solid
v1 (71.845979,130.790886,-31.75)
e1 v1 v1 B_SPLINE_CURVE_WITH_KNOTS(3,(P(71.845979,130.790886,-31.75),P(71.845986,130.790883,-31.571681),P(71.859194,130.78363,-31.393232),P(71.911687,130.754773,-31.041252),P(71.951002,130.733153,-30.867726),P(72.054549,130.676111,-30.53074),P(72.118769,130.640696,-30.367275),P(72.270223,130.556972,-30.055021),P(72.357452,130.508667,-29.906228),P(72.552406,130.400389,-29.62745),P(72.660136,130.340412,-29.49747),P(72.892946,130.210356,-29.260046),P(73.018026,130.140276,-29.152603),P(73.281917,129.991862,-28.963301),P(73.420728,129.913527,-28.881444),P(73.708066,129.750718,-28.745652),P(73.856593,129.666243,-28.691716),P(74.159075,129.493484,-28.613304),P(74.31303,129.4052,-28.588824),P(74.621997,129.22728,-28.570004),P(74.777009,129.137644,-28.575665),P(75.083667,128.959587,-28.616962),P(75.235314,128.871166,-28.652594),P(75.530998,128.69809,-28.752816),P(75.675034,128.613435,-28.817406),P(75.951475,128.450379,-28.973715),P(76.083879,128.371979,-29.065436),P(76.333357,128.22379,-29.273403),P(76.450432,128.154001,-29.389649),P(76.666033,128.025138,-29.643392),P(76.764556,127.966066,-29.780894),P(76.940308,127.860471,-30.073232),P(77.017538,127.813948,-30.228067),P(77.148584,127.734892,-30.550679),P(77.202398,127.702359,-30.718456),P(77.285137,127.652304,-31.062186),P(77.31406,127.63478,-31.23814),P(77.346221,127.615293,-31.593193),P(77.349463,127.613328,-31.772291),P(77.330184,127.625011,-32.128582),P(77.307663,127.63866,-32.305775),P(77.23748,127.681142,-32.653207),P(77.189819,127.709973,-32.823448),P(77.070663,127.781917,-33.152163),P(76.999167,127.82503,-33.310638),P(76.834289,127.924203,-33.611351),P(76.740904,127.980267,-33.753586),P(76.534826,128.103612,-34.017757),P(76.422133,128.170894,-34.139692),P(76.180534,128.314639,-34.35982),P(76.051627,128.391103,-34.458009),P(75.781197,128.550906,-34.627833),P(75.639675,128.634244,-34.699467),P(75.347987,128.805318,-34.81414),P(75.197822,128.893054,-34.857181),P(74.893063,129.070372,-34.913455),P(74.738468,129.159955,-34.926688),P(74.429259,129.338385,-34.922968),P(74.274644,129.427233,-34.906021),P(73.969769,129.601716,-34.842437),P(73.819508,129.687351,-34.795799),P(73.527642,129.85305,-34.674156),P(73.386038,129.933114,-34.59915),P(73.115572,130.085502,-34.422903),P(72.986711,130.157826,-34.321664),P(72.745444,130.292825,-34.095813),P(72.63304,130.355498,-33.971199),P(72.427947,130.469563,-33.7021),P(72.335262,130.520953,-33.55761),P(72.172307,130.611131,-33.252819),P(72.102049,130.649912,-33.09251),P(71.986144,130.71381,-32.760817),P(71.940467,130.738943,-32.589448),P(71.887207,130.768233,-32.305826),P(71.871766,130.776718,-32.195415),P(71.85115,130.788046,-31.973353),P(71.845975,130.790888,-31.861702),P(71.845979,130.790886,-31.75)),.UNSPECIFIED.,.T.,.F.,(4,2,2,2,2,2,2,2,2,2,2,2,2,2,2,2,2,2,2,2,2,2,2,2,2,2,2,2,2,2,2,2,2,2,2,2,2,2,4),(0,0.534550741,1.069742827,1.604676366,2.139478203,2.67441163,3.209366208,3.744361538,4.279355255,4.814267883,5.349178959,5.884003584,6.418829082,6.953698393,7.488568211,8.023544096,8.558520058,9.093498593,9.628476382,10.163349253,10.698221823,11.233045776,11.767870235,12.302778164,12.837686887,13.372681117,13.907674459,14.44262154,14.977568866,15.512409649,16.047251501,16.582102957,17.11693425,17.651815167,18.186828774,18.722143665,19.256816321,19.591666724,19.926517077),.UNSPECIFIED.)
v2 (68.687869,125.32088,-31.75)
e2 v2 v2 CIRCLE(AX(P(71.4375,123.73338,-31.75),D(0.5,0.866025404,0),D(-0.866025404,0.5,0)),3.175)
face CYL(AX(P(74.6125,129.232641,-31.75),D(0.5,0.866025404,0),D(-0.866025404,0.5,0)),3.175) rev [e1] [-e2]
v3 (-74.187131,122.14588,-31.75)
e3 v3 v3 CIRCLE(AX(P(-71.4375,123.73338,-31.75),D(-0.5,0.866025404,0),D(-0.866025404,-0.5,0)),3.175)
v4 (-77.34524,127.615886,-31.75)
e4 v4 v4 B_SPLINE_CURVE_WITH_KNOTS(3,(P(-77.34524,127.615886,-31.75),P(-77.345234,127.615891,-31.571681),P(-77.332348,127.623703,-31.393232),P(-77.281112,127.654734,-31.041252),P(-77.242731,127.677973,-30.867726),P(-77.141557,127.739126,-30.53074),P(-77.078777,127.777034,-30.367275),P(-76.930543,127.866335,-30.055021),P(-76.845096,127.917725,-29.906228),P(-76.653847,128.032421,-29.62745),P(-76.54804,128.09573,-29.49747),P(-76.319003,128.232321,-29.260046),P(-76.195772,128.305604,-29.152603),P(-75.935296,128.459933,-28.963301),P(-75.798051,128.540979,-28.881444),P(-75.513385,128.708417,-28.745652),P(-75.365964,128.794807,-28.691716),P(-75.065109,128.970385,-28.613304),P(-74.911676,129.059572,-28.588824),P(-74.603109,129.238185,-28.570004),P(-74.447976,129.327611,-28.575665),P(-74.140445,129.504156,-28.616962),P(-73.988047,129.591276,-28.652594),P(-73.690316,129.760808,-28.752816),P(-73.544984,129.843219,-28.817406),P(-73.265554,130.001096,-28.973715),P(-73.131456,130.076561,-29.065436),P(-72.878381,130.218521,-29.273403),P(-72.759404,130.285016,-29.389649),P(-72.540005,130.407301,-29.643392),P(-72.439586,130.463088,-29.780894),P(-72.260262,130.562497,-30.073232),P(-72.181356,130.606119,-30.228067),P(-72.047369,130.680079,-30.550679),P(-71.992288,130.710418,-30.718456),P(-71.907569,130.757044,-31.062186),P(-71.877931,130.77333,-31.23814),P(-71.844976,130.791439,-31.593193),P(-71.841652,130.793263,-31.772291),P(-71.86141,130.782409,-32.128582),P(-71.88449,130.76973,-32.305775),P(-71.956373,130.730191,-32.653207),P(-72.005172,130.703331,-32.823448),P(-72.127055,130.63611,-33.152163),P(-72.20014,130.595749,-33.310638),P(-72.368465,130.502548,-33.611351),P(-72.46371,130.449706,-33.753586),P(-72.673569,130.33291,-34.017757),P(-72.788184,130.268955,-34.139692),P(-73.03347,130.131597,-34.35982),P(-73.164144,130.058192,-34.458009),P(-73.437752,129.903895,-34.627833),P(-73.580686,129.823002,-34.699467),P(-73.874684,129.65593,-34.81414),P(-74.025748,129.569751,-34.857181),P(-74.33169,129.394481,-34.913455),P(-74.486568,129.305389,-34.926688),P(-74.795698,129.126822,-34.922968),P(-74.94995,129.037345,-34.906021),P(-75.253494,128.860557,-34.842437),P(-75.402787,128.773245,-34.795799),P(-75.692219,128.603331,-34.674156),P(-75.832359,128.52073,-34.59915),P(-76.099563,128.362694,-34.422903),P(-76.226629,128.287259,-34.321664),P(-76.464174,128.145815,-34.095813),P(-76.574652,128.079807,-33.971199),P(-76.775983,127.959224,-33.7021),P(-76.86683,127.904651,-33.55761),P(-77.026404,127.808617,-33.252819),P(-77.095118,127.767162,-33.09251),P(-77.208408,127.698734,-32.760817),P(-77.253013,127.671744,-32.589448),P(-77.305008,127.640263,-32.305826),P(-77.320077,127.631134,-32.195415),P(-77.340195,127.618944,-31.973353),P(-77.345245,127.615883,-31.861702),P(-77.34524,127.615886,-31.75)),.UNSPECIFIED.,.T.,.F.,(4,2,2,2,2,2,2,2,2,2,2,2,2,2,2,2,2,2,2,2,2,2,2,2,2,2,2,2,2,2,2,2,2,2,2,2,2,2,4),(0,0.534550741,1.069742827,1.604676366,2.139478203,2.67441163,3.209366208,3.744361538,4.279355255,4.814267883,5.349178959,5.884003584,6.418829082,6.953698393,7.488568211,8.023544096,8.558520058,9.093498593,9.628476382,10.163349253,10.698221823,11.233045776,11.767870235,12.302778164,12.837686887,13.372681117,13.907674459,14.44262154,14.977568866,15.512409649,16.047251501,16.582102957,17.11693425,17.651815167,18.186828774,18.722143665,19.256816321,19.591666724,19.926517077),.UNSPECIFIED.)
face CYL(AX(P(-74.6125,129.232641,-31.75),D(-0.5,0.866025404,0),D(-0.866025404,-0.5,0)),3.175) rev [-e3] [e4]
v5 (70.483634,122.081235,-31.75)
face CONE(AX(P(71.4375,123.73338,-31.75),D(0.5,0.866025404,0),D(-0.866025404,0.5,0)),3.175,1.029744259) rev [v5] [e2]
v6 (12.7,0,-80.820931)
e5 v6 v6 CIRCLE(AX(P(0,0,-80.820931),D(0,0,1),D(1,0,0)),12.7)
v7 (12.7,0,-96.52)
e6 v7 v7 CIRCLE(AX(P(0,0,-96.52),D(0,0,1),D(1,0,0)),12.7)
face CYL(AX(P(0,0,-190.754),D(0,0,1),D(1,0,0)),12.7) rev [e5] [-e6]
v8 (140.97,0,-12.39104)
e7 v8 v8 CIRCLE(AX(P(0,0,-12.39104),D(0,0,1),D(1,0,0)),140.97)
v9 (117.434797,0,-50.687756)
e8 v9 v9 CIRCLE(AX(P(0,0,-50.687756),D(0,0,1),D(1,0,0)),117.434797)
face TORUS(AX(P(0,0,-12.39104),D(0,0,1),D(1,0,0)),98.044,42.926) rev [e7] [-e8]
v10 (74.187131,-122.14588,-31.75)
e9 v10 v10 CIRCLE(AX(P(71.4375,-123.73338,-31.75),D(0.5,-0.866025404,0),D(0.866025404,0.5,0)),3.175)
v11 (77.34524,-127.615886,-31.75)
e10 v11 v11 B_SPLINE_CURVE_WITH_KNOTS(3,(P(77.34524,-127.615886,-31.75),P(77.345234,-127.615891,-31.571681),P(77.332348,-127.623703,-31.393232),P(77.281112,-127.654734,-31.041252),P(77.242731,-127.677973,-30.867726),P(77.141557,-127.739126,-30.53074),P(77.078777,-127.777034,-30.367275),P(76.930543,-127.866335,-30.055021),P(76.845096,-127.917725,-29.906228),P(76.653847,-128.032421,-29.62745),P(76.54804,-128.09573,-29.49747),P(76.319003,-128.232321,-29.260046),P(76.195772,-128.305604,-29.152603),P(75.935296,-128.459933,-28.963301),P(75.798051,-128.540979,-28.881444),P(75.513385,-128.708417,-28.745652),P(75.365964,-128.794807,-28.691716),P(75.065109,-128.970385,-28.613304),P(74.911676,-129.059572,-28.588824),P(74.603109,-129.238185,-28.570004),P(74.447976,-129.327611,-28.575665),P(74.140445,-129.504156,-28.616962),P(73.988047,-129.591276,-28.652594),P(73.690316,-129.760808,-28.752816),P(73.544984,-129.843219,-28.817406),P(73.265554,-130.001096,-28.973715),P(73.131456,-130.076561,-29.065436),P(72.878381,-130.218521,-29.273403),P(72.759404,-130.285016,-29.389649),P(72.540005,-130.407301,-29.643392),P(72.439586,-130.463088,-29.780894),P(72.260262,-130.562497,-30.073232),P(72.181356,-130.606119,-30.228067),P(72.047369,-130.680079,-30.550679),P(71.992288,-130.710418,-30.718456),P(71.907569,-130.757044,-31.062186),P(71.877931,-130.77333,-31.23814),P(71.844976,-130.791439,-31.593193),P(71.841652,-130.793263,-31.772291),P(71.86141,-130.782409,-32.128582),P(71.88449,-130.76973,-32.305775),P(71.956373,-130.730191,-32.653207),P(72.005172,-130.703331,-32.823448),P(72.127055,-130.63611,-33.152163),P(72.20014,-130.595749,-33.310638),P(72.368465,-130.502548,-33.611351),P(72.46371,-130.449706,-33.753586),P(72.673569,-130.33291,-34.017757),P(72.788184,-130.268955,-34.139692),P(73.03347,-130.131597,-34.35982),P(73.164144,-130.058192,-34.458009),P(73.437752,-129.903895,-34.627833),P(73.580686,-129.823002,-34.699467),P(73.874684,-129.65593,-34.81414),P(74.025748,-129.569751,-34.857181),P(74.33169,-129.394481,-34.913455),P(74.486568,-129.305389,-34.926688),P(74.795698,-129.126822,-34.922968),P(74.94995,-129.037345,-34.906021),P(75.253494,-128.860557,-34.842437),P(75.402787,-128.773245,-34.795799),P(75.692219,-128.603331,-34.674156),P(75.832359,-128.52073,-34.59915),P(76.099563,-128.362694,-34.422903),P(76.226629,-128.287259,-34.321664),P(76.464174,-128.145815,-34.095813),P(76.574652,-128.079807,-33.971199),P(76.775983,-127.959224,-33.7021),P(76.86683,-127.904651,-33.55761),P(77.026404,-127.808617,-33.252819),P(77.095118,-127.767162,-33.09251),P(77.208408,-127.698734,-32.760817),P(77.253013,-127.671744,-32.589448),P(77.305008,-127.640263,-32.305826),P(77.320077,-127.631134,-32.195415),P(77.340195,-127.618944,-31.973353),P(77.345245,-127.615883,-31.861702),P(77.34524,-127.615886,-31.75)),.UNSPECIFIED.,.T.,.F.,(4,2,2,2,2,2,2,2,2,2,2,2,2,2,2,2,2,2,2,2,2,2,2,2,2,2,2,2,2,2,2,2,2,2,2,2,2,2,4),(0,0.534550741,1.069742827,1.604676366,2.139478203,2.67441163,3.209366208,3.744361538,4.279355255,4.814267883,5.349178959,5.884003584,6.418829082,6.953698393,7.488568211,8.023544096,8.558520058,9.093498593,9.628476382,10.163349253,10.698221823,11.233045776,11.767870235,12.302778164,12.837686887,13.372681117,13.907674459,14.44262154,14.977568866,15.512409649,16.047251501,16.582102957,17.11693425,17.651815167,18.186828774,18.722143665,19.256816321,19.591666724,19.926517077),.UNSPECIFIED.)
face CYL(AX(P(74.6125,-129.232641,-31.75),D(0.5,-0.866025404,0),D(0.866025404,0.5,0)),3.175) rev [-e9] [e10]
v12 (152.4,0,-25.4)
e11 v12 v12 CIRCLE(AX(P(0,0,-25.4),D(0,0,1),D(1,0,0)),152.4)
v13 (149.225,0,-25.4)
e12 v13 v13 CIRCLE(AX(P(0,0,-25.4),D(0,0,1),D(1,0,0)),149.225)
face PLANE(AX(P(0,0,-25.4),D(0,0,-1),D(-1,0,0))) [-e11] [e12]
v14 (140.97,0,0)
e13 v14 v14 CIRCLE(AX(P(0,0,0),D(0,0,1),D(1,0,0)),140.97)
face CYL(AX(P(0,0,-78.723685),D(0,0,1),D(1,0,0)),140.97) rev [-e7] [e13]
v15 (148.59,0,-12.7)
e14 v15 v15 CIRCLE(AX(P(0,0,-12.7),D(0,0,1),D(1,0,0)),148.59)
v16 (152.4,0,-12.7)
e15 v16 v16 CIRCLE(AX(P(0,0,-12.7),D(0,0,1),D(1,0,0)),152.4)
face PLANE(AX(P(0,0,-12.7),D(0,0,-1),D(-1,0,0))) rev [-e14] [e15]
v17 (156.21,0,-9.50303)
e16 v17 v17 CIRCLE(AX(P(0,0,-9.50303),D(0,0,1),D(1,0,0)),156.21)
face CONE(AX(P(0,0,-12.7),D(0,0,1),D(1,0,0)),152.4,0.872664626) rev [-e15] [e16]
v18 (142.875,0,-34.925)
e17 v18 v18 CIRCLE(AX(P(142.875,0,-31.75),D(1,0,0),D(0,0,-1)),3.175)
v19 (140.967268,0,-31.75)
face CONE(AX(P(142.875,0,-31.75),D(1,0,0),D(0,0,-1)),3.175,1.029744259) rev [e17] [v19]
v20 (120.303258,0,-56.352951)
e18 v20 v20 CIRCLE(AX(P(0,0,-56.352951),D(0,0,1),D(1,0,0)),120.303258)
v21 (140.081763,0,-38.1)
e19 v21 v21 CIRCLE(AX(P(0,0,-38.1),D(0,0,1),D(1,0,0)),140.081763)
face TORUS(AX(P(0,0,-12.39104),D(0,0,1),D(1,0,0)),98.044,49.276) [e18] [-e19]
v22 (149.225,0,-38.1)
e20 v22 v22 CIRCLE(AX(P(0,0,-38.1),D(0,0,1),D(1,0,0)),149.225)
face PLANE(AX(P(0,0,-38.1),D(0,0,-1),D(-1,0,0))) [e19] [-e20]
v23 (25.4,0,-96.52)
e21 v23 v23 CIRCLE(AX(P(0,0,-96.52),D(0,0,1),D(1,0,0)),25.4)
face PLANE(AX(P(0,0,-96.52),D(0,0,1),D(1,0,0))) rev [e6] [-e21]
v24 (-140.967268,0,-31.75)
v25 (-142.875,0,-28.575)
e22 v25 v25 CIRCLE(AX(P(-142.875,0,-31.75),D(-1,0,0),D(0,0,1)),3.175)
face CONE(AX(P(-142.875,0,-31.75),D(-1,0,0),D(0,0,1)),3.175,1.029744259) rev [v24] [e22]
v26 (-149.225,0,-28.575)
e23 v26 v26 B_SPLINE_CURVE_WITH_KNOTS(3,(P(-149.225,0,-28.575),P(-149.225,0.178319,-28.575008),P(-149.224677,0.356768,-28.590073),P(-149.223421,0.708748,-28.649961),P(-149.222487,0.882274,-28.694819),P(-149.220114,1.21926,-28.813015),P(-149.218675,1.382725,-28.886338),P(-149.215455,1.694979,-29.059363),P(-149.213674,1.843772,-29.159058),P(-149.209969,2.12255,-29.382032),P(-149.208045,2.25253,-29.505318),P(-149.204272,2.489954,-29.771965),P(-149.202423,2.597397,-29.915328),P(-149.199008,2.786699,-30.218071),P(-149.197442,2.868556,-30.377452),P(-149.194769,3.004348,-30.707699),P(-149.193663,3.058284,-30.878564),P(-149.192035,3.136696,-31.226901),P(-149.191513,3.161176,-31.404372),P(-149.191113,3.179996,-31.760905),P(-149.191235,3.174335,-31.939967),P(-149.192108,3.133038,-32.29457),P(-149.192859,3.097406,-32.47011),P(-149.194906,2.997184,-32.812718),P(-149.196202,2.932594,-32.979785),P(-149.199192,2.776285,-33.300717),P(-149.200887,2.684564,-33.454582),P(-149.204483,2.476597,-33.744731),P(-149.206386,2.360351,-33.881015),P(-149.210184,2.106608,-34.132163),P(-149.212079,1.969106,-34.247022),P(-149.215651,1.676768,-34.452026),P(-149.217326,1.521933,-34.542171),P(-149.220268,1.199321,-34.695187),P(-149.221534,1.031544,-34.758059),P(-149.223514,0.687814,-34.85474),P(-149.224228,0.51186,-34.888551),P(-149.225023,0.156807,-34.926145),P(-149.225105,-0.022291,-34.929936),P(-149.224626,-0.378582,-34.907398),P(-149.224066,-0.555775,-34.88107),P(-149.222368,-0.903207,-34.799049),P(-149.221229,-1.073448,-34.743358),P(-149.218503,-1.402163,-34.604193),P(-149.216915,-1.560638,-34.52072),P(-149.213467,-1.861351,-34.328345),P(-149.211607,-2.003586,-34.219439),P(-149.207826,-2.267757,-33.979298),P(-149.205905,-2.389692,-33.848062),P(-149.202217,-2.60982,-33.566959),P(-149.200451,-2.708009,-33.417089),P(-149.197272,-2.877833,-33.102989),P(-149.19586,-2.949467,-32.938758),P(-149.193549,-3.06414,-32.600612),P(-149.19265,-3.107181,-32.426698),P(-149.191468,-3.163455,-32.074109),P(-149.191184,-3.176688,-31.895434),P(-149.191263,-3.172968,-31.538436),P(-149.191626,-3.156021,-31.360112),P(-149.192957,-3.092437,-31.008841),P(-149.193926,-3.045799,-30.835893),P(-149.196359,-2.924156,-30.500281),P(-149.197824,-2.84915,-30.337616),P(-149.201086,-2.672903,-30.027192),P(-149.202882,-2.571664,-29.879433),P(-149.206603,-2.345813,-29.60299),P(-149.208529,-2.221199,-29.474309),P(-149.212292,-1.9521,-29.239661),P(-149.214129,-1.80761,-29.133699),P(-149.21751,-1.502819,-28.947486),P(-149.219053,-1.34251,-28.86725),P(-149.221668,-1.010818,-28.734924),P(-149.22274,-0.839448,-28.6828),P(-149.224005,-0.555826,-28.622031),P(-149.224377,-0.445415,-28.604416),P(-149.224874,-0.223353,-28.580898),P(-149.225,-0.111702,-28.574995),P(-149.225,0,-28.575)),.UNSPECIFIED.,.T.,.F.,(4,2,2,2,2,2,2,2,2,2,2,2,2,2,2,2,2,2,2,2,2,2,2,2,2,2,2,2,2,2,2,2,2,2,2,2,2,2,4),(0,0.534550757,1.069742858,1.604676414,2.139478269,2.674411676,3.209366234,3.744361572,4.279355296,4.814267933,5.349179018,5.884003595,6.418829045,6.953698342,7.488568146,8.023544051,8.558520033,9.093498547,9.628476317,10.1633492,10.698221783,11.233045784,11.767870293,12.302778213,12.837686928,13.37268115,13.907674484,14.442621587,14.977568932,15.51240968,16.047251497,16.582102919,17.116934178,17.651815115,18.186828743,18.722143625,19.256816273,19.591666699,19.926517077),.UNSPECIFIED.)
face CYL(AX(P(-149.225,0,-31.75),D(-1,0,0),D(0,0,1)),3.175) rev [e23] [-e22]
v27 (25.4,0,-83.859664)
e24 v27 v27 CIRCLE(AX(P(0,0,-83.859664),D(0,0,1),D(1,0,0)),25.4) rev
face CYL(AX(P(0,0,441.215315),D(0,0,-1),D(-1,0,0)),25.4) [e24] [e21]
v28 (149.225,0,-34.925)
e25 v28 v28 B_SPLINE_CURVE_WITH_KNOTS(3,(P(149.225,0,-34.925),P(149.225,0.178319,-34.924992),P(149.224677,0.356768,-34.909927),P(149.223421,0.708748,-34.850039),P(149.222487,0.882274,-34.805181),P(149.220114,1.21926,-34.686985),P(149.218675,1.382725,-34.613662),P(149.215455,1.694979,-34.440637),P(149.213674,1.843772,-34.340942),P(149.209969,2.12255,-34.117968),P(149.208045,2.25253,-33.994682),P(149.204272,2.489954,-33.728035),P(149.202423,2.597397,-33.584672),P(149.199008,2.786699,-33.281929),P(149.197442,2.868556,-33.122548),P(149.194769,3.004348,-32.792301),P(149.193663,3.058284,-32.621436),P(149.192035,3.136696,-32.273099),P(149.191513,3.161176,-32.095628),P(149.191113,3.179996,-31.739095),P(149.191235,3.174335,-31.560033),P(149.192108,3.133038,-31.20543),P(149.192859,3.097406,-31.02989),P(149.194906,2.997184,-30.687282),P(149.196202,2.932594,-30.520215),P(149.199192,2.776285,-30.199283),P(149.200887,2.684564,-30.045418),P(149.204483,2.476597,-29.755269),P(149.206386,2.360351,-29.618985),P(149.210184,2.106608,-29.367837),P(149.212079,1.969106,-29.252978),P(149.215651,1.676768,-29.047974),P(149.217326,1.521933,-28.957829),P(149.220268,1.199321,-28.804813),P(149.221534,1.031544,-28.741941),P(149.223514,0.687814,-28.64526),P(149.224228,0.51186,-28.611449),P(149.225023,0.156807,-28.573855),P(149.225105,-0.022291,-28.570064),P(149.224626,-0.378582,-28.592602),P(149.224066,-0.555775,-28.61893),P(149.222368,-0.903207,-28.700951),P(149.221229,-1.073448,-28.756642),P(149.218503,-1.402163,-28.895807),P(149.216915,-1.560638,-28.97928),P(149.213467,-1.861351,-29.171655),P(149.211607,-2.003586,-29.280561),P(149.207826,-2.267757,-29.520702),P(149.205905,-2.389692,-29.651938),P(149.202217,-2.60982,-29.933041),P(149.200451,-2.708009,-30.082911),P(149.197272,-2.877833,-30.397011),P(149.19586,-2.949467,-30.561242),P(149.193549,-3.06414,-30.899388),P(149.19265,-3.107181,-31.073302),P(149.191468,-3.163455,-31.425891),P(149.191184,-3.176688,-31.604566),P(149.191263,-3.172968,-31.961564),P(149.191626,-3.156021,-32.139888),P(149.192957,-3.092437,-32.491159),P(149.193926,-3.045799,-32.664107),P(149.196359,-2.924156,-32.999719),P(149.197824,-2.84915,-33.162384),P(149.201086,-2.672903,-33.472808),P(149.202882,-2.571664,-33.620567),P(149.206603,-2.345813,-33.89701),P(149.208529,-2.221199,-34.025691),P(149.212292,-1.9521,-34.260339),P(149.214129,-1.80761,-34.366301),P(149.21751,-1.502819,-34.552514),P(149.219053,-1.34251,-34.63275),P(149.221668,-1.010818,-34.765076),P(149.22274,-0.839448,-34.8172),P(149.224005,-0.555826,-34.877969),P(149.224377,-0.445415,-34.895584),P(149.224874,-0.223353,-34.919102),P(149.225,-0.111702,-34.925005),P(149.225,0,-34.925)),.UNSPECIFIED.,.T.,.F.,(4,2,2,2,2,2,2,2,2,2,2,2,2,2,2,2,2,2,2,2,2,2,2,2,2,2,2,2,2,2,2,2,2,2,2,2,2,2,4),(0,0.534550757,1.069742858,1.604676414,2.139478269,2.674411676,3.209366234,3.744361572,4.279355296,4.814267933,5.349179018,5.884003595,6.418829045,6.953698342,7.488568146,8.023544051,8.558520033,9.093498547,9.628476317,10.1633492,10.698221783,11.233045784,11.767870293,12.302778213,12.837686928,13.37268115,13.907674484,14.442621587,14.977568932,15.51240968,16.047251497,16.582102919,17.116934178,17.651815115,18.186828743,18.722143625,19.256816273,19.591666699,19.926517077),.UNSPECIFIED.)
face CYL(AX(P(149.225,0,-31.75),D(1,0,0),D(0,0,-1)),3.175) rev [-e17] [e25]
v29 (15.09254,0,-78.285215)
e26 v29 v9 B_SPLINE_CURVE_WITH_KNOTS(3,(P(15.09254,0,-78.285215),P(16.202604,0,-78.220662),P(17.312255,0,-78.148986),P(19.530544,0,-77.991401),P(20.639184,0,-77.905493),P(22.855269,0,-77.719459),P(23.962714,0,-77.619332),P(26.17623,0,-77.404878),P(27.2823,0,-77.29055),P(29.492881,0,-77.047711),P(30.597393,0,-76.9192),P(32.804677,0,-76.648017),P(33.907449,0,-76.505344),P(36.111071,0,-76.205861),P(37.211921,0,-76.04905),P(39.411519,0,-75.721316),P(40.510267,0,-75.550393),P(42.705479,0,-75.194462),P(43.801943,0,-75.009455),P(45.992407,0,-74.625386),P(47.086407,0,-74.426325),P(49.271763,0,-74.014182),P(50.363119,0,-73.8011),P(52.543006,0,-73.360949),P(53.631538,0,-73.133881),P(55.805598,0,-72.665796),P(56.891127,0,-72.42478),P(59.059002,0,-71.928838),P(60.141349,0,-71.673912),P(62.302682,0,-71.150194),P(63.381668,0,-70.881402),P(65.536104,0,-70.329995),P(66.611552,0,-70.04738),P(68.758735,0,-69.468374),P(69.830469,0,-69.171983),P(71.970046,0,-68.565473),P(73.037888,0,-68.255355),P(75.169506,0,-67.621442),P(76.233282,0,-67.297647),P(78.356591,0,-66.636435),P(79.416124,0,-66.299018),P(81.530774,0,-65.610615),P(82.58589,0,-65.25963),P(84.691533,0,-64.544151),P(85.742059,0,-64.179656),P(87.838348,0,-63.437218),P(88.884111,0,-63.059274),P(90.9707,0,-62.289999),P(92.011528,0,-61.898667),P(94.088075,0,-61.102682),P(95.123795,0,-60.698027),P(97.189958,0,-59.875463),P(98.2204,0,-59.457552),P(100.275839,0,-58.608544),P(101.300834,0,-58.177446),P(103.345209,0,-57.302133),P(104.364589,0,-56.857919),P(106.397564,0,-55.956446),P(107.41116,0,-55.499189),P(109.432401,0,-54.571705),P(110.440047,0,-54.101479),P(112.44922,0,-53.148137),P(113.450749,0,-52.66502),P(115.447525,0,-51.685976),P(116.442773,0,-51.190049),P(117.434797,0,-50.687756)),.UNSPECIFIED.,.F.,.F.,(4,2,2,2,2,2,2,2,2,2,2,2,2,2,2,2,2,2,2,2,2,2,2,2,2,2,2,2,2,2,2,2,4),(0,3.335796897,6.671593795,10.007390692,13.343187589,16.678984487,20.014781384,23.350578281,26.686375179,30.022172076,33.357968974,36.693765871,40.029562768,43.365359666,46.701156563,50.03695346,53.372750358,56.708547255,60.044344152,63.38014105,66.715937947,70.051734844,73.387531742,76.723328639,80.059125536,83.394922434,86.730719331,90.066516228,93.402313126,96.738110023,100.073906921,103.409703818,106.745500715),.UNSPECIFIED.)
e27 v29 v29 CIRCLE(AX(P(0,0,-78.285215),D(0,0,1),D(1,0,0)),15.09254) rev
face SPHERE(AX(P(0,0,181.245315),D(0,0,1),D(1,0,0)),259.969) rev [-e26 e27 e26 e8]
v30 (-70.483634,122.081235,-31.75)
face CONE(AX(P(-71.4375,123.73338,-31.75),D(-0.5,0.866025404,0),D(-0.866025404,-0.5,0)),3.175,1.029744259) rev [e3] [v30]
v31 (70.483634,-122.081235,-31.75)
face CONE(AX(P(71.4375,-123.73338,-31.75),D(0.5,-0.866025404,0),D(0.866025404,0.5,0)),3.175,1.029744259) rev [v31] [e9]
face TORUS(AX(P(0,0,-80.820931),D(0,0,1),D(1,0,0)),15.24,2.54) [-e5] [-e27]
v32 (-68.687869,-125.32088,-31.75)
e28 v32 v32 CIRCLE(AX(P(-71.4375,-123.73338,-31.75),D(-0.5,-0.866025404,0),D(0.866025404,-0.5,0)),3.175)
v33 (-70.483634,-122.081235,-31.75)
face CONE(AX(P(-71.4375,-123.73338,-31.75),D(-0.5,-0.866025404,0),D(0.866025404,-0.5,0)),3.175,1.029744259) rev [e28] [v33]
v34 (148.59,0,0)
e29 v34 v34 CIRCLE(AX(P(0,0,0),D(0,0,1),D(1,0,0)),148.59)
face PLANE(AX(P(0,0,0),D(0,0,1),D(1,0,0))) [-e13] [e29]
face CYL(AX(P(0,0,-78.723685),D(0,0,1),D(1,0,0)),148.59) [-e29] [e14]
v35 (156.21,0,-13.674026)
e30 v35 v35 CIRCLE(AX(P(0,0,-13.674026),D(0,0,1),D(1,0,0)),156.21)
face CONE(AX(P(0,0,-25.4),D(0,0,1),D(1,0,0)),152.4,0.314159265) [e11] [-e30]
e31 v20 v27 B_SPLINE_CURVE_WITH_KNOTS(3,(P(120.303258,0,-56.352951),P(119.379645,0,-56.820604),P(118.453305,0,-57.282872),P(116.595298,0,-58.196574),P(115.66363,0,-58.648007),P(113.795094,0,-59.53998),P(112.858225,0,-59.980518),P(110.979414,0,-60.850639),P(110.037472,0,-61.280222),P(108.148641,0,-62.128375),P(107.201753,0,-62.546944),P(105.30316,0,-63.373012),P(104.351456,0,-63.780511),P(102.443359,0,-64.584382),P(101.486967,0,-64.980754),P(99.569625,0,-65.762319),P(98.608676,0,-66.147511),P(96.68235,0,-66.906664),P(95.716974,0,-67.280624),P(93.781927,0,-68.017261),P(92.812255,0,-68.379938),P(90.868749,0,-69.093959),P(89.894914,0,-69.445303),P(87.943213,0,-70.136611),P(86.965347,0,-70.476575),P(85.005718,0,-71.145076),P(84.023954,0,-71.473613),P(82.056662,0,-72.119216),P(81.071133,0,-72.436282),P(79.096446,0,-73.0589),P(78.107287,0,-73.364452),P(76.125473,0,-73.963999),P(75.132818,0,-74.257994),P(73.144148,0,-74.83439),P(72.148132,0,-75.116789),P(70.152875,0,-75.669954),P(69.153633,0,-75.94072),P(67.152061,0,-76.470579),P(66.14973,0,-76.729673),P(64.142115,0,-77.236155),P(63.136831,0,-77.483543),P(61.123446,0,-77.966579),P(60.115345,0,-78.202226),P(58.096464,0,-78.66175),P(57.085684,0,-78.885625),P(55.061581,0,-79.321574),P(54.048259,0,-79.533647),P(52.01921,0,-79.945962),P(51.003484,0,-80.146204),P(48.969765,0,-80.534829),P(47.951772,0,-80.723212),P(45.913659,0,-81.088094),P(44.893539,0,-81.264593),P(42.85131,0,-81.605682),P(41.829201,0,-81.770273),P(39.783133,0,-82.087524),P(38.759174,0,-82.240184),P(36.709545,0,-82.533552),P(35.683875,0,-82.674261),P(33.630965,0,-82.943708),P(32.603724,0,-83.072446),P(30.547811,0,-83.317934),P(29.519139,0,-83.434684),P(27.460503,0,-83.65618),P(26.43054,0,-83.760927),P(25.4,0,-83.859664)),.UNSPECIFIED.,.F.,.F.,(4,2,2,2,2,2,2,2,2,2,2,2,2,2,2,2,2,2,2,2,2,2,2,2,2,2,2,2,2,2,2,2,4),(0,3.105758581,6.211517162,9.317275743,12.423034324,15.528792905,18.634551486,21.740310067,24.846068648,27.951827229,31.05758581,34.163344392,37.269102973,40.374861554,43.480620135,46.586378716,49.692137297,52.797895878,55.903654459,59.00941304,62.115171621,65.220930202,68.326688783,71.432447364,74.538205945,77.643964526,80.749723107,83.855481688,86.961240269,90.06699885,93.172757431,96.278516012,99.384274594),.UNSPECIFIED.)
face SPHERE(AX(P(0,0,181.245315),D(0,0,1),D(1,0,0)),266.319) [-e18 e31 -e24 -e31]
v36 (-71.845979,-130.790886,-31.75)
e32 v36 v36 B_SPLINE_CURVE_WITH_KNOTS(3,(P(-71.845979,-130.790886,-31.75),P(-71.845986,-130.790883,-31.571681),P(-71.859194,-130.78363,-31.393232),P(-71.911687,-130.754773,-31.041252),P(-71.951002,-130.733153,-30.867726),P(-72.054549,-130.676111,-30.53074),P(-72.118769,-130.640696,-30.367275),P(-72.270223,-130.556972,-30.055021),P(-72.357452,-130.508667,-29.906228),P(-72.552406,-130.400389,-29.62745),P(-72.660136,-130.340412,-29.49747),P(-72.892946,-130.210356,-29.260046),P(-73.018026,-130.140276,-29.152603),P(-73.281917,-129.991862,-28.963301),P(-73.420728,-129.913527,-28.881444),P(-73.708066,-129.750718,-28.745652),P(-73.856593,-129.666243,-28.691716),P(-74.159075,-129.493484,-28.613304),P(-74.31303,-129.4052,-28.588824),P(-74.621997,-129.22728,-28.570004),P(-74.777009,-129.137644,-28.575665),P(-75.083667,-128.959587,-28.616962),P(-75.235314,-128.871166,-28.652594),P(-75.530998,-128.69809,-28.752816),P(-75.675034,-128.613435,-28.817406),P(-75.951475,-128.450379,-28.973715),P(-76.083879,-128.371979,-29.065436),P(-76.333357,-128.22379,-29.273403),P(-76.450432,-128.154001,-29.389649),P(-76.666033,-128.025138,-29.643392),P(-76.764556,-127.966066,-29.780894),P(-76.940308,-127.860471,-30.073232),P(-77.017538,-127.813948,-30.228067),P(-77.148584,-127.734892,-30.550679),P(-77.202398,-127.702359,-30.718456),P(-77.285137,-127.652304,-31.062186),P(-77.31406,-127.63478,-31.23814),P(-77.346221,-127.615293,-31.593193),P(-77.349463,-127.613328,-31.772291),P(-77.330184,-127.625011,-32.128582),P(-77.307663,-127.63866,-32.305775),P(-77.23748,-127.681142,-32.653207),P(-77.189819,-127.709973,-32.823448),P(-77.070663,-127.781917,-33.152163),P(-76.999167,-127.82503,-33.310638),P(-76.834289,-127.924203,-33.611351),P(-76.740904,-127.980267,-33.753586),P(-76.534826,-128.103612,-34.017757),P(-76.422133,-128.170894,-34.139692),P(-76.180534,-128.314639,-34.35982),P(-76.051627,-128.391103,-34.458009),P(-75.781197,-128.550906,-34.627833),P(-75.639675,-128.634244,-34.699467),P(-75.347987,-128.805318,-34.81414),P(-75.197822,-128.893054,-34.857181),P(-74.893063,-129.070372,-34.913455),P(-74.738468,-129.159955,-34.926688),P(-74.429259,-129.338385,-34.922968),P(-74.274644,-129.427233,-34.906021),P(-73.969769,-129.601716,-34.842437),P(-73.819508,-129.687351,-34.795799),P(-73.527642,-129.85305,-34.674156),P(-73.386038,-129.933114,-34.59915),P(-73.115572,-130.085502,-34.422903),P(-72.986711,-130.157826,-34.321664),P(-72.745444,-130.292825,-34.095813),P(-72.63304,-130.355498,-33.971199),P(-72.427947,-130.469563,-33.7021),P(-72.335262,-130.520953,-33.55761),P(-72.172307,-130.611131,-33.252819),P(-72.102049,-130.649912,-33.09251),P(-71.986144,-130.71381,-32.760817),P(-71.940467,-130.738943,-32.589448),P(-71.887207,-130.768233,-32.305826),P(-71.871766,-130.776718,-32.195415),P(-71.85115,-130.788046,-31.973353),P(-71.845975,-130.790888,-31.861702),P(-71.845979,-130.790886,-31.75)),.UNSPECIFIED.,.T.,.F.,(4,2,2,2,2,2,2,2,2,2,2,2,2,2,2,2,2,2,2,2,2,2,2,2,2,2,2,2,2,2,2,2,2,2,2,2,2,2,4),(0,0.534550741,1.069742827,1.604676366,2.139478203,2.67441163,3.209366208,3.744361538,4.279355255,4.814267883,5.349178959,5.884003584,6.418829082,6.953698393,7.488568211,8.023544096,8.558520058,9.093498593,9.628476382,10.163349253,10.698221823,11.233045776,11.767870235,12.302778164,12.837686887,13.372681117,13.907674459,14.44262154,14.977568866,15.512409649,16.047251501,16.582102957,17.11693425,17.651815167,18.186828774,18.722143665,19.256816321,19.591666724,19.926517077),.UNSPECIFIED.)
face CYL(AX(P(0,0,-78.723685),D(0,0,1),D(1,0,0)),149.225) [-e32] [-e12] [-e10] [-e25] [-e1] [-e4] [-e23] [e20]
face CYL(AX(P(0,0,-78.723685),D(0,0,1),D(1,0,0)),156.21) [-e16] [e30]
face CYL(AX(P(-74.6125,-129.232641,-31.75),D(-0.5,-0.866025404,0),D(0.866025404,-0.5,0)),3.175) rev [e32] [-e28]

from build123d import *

# Parameters (mm, degrees)
BOSS_EXTRUDE2_REACH      = 243.079
BOSS_EXTRUDE2_END_RADIUS = 266.319
SKETCH10_R               = 25.4
SKETCH11_R               = 12.7
CUT_EXTRUDE1_DEPTH       = 190.754
CIRPATTERN1_COUNT        = 6


with BuildPart() as part:
    # Sketch1 → Revolve1 (revolve)
    with BuildSketch(Plane(origin=(0, 0, 0), x_dir=(1, 0, 0), z_dir=(0, 1, 0)), mode=Mode.PRIVATE) as revolve1_sk:
        with BuildLine():
            Line((-148.59, 0), (-140.97, 0))
            Line((-140.97, 0), (-140.97, 12.391039743))
            ThreePointArc((-140.97, 12.391039743), (-134.615921102, 34.866271953), (-117.434796957, 50.687755913))
            ThreePointArc((-117.434796957, 50.687755913), (-60.367509579, 71.617582047), (0, 78.72368491))
            Line((0, 78.72368491), (0, 85.07368491))
            ThreePointArc((0, 85.07368491), (-61.842045719, 77.794008454), (-120.303258046, 56.352950612))
            ThreePointArc((-120.303258046, 56.352950612), (-131.462846302, 48.602983737), (-140.081763243, 38.1))
            Line((-140.081763243, 38.1), (-149.225, 38.1))
            Line((-149.225, 38.1), (-149.225, 25.4))
            Line((-149.225, 25.4), (-152.4, 25.4))
            Line((-152.4, 25.4), (-156.21, 13.674025723))
            Line((-156.21, 13.674025723), (-156.21, 9.503030405))
            Line((-156.21, 9.503030405), (-152.4, 12.7))
            Line((-152.4, 12.7), (-148.59, 12.7))
            Line((-148.59, 12.7), (-148.59, 0))
        make_face()
    revolve(revolve1_sk.sketch.rotate(Axis((0, 0, -78.72368491), (0, 0, -1)), 180), axis=Axis((0, 0, -78.72368491), (0, 0, -1)))

    # Boss-Extrude2: up to this sphere (the profile starts outside it)
    boss_extrude2_end = Location((0, 0, 181.24531509)) * Sphere(BOSS_EXTRUDE2_END_RADIUS, mode=Mode.PRIVATE)
    # Sketch10 → Boss-Extrude2 (add, up to the surface)
    with BuildSketch(Plane.XY.offset(-96.52), mode=Mode.PRIVATE) as boss_extrude2_sk1:
        Circle(SKETCH10_R)
    boss_extrude2_tool1 = extrude(boss_extrude2_sk1.sketch, amount=BOSS_EXTRUDE2_REACH, mode=Mode.PRIVATE) - boss_extrude2_end
    add(boss_extrude2_tool1.solids().sort_by_distance((0, 0, -96.52))[0])

    # Sketch11 → Cut-Extrude1 (cut)
    with BuildSketch(Plane.XY):
        Circle(SKETCH11_R)
    extrude(amount=-CUT_EXTRUDE1_DEPTH, mode=Mode.SUBTRACT)

    # Sketch15 → 1/4 (0.25) Diameter Hole1 (revolve, cut)
    with BuildSketch(Plane(origin=(149.225, 0, -31.75), x_dir=(0, 0, -1), z_dir=(0, 1, 0))):
        Polygon((0, 0), (0, 8.257732465), (3.175, 6.35), (3.175, 0), align=None)
    f_1_4_0_25_diameter_hole1 = revolve(axis=Axis((155.575, 0, -31.75), (-1, 0, 0)), mode=Mode.SUBTRACT)

    # CirPattern1: 1/4 (0.25) Diameter Hole1 ×6 about axis
    cirpattern1_axis = Axis((0, 0, 5.473137056), (0, 0, -1))
    for i in range(1, CIRPATTERN1_COUNT):
        add(f_1_4_0_25_diameter_hole1.rotate(cirpattern1_axis, i * 360 / CIRPATTERN1_COUNT), mode=Mode.SUBTRACT)

    # Fillet1: read off the stored shape, not the designer's step
    # Fillet1 outline → Fillet1 (revolve, cut)
    with BuildSketch(Plane.XZ):
        with BuildLine():
            ThreePointArc((12.7, -80.82093127), (13.39254924, -79.077794531), (15.092539913, -78.285215291))
            Line((15.092539913, -78.285215291), (12.7, -78.285215291))
            Line((12.7, -78.285215291), (12.7, -80.82093127))
        make_face()
    revolve(axis=Axis((0, 0, 0), (0, 0, 1)), mode=Mode.SUBTRACT)


solid = part.part
